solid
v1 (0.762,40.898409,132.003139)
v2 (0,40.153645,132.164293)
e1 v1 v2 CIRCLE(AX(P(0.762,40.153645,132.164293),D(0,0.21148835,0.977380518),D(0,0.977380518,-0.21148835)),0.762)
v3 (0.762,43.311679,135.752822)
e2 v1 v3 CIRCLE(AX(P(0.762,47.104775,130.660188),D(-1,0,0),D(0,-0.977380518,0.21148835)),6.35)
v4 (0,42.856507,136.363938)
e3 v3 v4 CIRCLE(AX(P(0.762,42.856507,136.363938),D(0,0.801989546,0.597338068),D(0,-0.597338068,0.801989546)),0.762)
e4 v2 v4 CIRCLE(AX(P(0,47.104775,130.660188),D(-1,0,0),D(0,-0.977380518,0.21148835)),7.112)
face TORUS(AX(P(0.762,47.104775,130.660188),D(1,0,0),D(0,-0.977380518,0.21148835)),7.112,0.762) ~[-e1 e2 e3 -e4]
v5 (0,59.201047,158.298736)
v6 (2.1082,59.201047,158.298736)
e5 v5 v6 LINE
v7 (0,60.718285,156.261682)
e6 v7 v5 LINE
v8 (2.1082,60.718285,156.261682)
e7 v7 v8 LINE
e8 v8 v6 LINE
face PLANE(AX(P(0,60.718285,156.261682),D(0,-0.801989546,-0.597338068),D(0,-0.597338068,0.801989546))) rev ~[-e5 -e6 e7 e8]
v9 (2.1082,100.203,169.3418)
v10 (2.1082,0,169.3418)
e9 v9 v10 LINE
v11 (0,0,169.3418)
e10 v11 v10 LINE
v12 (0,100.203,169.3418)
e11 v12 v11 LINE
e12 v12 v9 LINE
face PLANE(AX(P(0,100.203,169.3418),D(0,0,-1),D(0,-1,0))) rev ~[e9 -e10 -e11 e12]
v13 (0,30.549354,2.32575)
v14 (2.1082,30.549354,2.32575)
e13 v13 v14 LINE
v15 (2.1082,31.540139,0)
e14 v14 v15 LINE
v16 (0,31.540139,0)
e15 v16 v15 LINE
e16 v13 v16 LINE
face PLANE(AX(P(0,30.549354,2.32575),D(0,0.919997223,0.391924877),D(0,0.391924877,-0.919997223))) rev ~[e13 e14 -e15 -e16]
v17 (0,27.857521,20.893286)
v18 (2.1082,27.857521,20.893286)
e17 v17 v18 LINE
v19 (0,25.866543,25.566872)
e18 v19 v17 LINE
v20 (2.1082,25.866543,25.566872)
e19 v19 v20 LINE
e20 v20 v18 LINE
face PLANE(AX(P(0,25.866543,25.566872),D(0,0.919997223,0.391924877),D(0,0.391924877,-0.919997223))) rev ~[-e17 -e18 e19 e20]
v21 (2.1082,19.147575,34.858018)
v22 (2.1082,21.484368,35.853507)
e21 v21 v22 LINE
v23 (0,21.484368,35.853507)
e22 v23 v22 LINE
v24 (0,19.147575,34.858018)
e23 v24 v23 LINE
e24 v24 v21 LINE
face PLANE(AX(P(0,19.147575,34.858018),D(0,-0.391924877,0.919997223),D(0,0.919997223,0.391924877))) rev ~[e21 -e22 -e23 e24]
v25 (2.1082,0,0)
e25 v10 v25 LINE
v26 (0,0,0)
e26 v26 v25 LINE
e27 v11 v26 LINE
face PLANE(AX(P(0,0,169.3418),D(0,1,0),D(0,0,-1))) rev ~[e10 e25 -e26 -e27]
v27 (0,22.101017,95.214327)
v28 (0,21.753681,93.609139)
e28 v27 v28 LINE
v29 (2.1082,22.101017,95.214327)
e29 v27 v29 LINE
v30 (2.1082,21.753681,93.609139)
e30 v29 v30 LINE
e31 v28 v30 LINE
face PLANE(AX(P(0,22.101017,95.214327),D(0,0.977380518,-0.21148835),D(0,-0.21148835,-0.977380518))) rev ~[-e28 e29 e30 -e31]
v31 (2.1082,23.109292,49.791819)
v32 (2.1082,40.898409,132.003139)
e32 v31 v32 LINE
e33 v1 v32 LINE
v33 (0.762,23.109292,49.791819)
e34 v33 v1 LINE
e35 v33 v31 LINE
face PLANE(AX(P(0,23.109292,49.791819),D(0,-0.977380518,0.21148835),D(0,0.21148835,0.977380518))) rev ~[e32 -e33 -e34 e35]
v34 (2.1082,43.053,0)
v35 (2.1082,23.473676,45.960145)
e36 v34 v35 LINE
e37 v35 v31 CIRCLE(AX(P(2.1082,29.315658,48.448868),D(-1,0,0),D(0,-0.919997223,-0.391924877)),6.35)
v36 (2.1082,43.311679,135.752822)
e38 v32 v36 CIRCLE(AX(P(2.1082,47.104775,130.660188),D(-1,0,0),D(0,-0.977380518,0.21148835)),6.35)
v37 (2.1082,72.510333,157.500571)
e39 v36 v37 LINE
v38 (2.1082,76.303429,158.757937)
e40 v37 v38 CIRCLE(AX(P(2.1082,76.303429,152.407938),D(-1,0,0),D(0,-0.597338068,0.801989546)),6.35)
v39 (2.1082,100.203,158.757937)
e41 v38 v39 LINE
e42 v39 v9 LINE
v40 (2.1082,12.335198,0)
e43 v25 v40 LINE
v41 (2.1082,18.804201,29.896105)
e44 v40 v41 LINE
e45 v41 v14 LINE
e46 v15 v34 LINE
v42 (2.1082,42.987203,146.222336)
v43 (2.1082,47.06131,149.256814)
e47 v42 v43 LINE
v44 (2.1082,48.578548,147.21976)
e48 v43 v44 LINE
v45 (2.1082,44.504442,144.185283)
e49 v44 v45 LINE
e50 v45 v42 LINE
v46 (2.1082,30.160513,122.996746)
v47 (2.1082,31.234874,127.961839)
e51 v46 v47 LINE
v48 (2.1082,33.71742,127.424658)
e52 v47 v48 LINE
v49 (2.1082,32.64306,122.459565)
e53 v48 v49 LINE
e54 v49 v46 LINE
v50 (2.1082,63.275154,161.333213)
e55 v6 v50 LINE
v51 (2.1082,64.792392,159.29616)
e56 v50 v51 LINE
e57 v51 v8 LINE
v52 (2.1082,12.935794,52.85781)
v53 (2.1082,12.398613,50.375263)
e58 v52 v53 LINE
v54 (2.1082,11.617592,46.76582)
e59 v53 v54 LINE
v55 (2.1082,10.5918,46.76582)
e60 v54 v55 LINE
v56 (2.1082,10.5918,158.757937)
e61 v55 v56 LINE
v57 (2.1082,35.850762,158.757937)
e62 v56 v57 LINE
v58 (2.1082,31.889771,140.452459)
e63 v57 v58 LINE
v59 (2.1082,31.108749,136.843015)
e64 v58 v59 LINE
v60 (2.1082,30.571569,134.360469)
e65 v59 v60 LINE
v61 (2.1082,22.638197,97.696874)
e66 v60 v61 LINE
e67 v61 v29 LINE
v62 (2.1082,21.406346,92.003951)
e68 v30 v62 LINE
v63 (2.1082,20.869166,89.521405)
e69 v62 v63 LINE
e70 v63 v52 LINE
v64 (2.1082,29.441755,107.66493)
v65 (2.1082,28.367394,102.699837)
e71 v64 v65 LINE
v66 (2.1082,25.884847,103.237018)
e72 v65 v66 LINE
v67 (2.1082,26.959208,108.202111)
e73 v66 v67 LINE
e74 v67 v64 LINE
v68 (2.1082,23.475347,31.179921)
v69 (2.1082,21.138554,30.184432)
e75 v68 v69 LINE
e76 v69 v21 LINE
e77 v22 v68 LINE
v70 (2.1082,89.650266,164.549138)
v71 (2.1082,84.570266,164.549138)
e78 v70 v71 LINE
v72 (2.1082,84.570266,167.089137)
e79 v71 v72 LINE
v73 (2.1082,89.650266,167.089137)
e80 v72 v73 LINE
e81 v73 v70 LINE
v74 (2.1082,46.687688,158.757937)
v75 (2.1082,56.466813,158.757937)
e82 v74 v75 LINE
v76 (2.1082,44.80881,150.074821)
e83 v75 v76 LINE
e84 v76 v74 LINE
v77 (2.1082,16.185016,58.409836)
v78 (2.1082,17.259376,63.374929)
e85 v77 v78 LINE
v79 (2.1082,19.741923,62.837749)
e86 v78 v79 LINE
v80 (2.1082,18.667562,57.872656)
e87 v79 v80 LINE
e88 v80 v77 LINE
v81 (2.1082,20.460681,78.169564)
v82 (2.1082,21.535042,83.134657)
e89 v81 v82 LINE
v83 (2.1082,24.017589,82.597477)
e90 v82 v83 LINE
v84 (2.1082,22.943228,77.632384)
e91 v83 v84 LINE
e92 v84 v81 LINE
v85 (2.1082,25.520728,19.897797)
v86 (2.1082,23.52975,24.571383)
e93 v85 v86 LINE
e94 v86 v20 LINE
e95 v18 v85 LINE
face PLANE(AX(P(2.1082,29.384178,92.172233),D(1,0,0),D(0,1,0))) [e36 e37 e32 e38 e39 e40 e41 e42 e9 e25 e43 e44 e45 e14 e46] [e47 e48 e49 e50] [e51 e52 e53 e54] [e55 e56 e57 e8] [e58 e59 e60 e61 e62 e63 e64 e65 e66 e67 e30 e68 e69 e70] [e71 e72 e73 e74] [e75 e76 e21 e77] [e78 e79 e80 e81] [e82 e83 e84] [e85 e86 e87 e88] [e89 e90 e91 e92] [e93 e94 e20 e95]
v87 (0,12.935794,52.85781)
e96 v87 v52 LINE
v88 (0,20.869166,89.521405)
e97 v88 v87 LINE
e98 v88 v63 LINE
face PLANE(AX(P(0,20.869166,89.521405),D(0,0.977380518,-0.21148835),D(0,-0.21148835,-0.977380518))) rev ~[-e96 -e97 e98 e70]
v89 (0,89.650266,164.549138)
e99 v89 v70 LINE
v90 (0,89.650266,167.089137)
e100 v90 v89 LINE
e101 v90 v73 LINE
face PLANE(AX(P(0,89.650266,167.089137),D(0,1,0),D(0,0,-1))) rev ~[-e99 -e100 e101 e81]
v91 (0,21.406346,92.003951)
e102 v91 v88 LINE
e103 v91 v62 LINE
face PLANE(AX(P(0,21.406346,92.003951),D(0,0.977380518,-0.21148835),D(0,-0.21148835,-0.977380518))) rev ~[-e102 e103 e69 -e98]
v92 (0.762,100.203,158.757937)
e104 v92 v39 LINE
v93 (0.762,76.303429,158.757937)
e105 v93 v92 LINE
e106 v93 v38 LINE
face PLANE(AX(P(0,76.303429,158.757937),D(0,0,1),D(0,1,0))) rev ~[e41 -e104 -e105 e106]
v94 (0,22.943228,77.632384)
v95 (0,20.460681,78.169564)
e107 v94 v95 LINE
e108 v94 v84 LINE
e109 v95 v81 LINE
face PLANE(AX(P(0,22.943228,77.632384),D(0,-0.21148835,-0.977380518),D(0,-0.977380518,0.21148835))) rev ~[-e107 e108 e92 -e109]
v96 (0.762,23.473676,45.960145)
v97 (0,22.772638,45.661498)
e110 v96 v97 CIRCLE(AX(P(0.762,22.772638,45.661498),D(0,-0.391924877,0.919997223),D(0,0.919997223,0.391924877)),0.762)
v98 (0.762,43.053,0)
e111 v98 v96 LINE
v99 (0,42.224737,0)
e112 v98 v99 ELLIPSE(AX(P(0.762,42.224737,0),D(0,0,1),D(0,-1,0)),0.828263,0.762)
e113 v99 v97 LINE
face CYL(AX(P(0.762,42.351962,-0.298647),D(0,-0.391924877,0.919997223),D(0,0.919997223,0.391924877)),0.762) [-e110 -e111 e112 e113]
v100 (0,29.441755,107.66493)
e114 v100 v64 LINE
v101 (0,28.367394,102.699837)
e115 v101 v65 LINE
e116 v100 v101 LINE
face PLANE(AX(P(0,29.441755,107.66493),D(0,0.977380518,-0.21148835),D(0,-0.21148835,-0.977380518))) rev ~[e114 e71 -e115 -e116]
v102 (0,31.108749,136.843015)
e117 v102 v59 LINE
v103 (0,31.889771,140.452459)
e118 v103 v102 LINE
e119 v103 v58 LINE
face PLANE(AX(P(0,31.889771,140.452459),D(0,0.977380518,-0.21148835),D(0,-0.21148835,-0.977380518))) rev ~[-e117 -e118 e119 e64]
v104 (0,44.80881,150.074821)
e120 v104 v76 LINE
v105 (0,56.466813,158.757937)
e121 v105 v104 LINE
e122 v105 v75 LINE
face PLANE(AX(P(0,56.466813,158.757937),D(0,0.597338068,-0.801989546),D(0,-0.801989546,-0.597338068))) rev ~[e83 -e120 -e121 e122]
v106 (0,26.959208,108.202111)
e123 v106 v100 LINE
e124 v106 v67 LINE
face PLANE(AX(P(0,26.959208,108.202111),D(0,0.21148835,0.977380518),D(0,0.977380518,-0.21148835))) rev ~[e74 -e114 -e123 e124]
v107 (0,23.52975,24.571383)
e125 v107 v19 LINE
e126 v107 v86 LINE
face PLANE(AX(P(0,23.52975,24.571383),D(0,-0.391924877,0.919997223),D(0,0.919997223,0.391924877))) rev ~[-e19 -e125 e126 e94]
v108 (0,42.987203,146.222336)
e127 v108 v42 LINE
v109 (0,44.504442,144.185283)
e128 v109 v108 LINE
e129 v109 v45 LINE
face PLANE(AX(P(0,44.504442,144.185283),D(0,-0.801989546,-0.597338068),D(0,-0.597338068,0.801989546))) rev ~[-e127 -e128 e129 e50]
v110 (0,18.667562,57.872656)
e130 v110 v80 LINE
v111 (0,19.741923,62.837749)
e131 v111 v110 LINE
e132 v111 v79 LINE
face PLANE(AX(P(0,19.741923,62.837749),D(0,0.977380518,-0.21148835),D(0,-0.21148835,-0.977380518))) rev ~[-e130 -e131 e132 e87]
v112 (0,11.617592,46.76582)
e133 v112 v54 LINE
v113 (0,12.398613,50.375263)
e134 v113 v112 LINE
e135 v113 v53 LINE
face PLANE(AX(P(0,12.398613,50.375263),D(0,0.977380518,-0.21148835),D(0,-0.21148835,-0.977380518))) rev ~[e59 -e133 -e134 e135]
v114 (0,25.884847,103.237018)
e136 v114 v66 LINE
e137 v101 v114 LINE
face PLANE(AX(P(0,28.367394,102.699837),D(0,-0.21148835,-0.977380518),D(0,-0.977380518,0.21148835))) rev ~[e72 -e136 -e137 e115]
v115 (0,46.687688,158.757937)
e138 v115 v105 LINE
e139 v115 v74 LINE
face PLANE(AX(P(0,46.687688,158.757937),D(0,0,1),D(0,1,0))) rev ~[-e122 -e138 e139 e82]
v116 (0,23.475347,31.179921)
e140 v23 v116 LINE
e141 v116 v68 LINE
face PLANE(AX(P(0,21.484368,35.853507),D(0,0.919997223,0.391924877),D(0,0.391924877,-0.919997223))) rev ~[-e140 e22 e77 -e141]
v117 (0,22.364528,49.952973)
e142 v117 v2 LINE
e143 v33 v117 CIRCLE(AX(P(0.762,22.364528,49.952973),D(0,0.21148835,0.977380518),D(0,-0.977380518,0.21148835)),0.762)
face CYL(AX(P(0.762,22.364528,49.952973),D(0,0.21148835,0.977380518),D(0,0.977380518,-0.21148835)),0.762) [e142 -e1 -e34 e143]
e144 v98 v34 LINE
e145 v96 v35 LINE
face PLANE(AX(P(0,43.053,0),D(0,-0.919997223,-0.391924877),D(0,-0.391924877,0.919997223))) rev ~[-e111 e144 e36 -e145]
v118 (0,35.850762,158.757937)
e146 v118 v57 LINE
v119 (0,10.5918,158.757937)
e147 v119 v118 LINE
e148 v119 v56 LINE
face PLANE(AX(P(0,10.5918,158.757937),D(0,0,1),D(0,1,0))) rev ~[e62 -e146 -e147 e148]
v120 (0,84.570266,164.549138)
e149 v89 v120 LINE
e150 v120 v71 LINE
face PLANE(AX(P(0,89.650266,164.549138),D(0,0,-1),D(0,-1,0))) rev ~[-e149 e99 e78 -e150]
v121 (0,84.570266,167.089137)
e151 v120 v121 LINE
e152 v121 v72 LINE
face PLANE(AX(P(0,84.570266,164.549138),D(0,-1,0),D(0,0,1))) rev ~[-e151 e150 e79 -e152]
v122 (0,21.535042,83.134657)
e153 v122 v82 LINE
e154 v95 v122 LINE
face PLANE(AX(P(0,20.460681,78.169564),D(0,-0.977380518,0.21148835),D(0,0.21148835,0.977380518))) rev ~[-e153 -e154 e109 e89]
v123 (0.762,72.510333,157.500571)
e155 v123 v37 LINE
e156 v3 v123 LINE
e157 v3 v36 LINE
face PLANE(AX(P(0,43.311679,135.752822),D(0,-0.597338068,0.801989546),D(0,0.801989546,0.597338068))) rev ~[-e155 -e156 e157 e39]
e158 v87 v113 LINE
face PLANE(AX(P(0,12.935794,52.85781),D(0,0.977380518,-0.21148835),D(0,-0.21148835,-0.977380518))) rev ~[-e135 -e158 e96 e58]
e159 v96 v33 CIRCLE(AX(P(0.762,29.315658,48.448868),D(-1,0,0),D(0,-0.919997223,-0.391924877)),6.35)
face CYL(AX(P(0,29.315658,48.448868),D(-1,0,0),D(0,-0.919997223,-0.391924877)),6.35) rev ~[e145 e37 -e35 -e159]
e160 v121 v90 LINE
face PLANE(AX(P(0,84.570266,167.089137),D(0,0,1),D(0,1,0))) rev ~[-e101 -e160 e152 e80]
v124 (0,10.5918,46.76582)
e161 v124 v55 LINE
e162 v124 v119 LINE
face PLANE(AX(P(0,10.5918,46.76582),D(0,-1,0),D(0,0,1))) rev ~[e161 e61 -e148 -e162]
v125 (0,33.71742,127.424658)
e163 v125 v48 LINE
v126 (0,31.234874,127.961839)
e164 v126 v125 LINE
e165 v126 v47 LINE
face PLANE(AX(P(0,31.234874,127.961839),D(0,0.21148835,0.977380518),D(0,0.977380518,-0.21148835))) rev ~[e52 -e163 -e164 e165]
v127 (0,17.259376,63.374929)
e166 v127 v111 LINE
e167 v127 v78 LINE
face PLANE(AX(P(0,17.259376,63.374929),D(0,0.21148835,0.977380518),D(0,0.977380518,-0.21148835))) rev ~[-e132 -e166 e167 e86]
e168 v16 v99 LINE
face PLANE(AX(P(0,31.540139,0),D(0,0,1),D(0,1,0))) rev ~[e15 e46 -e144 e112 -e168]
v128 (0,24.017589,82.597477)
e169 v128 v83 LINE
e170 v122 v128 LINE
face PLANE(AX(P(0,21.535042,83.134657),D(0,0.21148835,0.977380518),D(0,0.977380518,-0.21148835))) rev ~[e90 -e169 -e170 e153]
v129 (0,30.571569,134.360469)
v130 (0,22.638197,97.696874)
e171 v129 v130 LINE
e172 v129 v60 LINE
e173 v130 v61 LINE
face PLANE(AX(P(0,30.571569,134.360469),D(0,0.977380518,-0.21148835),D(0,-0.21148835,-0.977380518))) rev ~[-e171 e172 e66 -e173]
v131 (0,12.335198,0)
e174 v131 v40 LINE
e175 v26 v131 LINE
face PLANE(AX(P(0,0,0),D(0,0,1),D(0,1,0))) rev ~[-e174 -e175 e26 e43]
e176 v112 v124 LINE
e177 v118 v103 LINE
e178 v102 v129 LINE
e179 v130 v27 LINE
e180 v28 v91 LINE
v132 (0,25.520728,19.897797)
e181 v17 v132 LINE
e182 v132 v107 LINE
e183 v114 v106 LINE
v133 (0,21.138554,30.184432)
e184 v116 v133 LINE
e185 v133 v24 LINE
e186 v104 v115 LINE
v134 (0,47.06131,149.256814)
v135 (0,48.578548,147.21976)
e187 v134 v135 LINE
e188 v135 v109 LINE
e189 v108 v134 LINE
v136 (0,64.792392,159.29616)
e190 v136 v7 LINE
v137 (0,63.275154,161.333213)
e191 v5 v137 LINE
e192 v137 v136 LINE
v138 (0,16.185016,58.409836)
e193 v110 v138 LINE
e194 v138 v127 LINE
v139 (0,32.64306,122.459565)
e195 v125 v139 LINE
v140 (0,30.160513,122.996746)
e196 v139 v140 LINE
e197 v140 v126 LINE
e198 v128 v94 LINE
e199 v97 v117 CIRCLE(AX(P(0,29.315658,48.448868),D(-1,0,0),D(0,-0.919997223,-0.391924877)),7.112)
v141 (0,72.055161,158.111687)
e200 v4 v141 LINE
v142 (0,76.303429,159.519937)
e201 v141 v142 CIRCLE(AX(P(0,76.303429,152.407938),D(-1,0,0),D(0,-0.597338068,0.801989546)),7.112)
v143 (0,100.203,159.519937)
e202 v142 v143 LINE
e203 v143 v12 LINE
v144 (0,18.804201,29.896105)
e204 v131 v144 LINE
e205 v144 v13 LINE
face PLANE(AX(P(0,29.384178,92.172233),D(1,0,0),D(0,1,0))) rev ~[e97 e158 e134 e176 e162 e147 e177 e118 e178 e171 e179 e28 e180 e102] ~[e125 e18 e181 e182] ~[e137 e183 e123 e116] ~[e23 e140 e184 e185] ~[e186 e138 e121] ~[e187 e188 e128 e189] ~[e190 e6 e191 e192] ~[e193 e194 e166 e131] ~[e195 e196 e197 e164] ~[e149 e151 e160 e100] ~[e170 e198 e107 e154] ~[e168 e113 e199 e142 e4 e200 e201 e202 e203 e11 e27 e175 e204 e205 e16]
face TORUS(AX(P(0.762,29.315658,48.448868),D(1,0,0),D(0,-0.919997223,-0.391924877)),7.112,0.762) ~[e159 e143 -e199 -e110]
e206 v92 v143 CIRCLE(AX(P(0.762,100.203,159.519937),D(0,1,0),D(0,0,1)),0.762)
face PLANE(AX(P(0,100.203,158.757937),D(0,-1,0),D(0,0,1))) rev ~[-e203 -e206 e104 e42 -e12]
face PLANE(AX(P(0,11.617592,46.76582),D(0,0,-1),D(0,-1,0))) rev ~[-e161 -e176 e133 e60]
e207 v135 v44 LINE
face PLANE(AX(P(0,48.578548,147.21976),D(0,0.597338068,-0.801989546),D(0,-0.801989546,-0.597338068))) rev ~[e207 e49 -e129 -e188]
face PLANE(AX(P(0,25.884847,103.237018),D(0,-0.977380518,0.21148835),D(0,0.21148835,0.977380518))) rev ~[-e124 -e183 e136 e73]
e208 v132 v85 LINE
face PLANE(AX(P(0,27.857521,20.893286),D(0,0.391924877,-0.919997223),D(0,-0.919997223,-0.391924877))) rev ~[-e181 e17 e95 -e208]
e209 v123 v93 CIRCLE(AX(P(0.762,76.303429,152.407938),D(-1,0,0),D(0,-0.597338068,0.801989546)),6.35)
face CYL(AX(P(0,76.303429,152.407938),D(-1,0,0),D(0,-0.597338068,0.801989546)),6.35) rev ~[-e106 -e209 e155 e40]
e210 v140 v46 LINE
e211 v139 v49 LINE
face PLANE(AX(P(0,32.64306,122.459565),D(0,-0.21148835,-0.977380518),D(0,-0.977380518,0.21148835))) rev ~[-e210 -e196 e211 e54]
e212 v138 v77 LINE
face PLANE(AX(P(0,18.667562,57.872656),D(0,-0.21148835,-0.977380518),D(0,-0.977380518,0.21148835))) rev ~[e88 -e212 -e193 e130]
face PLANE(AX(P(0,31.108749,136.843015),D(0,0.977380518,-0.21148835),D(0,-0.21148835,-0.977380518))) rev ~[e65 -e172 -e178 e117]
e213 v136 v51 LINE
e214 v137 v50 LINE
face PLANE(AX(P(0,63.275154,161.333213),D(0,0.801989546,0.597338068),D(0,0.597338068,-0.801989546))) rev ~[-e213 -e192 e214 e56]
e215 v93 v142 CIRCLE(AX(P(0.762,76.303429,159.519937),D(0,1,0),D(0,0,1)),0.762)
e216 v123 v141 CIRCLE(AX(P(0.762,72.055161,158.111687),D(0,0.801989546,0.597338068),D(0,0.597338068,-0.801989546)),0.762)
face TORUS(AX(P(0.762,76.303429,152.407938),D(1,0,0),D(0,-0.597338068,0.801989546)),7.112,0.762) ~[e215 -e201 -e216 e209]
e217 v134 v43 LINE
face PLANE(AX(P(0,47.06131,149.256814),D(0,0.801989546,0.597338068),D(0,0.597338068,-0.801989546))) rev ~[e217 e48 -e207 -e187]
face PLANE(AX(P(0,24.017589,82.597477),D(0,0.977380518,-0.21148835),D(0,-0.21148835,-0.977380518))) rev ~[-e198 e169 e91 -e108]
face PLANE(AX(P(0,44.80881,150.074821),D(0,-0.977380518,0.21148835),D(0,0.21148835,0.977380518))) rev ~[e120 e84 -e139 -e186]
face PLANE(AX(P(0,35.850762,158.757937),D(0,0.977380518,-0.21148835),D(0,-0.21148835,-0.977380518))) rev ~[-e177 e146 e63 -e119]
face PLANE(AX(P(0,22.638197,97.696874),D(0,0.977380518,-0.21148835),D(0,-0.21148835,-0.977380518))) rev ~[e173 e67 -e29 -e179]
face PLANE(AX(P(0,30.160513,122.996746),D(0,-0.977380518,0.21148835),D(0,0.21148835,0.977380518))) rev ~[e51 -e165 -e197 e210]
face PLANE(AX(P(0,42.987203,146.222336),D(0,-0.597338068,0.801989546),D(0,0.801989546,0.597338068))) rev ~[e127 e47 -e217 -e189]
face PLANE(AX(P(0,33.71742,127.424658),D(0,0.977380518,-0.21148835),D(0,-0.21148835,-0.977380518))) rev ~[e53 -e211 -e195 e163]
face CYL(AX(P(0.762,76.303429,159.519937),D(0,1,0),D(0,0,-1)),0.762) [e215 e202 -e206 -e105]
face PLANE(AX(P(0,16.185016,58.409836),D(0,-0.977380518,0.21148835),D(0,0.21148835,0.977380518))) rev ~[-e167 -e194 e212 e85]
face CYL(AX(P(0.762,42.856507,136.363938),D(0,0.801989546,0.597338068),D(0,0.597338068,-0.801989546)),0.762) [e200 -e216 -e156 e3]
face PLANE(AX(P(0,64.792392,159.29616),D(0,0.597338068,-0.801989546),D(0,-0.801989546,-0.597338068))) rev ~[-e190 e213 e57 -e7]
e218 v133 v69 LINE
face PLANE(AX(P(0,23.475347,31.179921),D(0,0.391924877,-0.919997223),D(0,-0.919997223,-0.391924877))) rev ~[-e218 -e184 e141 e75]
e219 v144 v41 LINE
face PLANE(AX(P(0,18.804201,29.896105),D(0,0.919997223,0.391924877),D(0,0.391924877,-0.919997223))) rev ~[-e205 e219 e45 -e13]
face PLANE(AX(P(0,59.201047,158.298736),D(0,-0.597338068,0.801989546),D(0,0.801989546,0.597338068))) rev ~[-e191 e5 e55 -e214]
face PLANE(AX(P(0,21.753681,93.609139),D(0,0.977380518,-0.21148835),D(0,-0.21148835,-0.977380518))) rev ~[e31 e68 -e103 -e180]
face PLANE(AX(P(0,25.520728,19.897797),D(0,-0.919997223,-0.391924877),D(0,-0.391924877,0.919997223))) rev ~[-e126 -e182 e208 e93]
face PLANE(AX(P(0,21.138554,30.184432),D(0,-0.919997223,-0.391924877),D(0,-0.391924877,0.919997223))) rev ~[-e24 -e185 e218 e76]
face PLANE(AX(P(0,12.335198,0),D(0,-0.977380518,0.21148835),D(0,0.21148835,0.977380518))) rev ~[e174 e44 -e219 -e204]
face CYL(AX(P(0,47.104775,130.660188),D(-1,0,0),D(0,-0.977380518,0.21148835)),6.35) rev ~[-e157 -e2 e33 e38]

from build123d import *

# Parameters (mm, degrees)
F0_W     = 5.08
F0_H     = 2.54
F1_DEPTH = 2.1082
F2_R     = 0.762


with BuildPart() as f1:
    # F0 (on Right) → F1 (new body)
    with BuildSketch(Plane.YZ):
        with BuildLine():
            Line((0, 162.0091375), (0, 0))
            Line((0, 0), (12.335197777, 0))
            Line((12.335197777, 0), (18.8042013144, 29.896105485))
            Line((18.8042013144, 29.896105485), (30.5493542935, 2.3257501254))
            Line((30.5493542935, 2.3257501254), (31.5401391658, 0))
            Line((31.5401391658, 0), (31.5707651968, 0))
            Line((31.5707651968, 0), (40.8442968098, 0))
            Line((40.8442968098, 0), (20.5594925834, 47.616175108))
            Line((20.5594925834, 47.616175108), (39.5771112022, 135.5049402038))
            Line((39.5771112022, 135.5049402038), (73.5248959406, 160.7899383022))
            Line((73.5248959406, 160.7899383022), (100.203, 160.7899383022))
            Line((100.203, 160.7899383022), (100.203, 162.0091375))
            Line((100.203, 162.0091375), (82.1398573303, 162.0091375))
            ThreePointArc((82.1398573303, 162.0091375), (80.3438061061, 162.7530862758), (79.5998573303, 164.5491375))
            Line((79.5998573303, 164.5491375), (79.5998573303, 169.3418))
            Line((79.5998573303, 169.3418), (70.6874244764, 169.3418))
            Line((70.6874244764, 169.3418), (70.6874244764, 165.8480664454))
            Line((70.6874244764, 165.8480664454), (70.6874244764, 164.5491375))
            ThreePointArc((70.6874244764, 164.5491375), (70.0510915867, 162.8675752701), (68.4609272063, 162.0285589874))
            ThreePointArc((68.4609272063, 162.0285589874), (68.3044763435, 162.0139975214), (68.1474244764, 162.0091375))
            Line((68.1474244764, 162.0091375), (0, 162.0091375))
        make_face()
        Polygon((21.4843682503, 35.8535070154), (23.4753466245, 31.1799211209), (21.1385536773, 30.1844319338), (19.147575303, 34.8580178283), align=None, mode=Mode.SUBTRACT)
        Polygon((25.8665425285, 25.5668719827), (27.8575209028, 20.8932860882), (25.5207279555, 19.8977969011), (23.5297495813, 24.5713827956), align=None, mode=Mode.SUBTRACT)
        with BuildLine():
            Line((12.3986134924, 50.3752630702), (11.6175919588, 46.7658196656))
            Line((11.6175919588, 46.7658196656), (10.5918, 46.7658196656))
            Line((10.5918, 46.7658196656), (10.5918, 158.7579375))
            Line((10.5918, 158.7579375), (35.8507619547, 158.7579375))
            Line((35.8507619547, 158.7579375), (31.8897708968, 140.4524587956))
            Line((31.8897708968, 140.4524587956), (31.1087493632, 136.8430153909))
            Line((31.1087493632, 136.8430153909), (35.5475592049, 135.882533211))
            ThreePointArc((35.5475592049, 135.882533211), (37.1456481821, 134.7755682604), (37.4929253116, 132.8628062845))
            Line((37.4929253116, 132.8628062845), (29.5595533377, 96.1992113407))
            ThreePointArc((29.5595533377, 96.1992113407), (28.452588387, 94.6011223635), (26.5398264112, 94.2538452339))
            Line((26.5398264112, 94.2538452339), (22.1010165695, 95.2143274138))
            Line((22.1010165695, 95.2143274138), (21.7536814278, 93.6091392306))
            Line((21.7536814278, 93.6091392306), (21.4063462861, 92.0039510473))
            Line((21.4063462861, 92.0039510473), (25.8451561277, 91.0434688674))
            ThreePointArc((25.8451561277, 91.0434688674), (27.4432451049, 89.9365039168), (27.7905222345, 88.0237419409))
            Line((27.7905222345, 88.0237419409), (19.8571502605, 51.3601469971))
            ThreePointArc((19.8571502605, 51.3601469971), (18.7501853099, 49.7620580199), (16.837423334, 49.4147808903))
            Line((16.837423334, 49.4147808903), (12.3986134924, 50.3752630702))
        make_face(mode=Mode.SUBTRACT)
        Polygon((47.0613097153, 149.2568137468), (48.5785484084, 147.2197602993), (44.5044415132, 144.1852829132), (42.9872028202, 146.2223363607), align=None, mode=Mode.SUBTRACT)
        Polygon((44.8088104432, 150.074821282), (46.6876875952, 158.7579375), (56.4668125154, 158.7579375), align=None, mode=Mode.SUBTRACT)
        Polygon((63.2751536106, 161.3332132886), (64.7923923036, 159.296159841), (60.7182854085, 156.2616824549), (59.2010467154, 158.2987359025), align=None, mode=Mode.SUBTRACT)
        with BuildLine():
            Line((0, 164.5491375), (0, 162.0091375))
            Line((0, 162.0091375), (68.1474244764, 162.0091375))
            ThreePointArc((68.1474244764, 162.0091375), (68.3044763435, 162.0139975214), (68.4609272063, 162.0285589874))
            Line((68.4609272063, 162.0285589874), (69.6856973646, 162.9407926238))
            Line((69.6856973646, 162.9407926238), (68.1474244764, 165.0060867035))
            Line((68.1474244764, 165.0060867035), (68.1474244764, 164.5491375))
            Line((68.1474244764, 164.5491375), (55.1748093832, 164.5491375))
            Line((55.1748093832, 164.5491375), (50.0948093832, 164.5491375))
            Line((50.0948093832, 164.5491375), (10.3999171089, 164.5491375))
            Line((10.3999171089, 164.5491375), (5.3199171089, 164.5491375))
            Line((5.3199171089, 164.5491375), (0, 164.5491375))
        make_face()
        Polygon((0, 169.3418), (0, 164.5491375), (5.3199171089, 164.5491375), (5.3199171089, 167.0891375), (10.3999171089, 167.0891375), (10.3999171089, 164.5491375), (50.0948093832, 164.5491375), (50.0948093832, 167.0891375), (55.1748093832, 167.0891375), (55.1748093832, 164.5491375), (68.1474244764, 164.5491375), (68.1474244764, 165.0060867035), (68.1474244764, 169.3418), align=None)
        with Locations((7.8599171089, 165.8191375)):
            Rectangle(F0_W, F0_H)
        with BuildLine():
            Line((69.6856973646, 162.9407926238), (68.4609272063, 162.0285589874))
            ThreePointArc((68.4609272063, 162.0285589874), (70.0510915867, 162.8675752701), (70.6874244764, 164.5491375))
            Line((70.6874244764, 164.5491375), (70.6874244764, 165.8480664454))
            Line((70.6874244764, 165.8480664454), (70.6874244764, 169.3418))
            Line((70.6874244764, 169.3418), (68.1474244764, 169.3418))
            Line((68.1474244764, 169.3418), (68.1474244764, 165.0060867035))
            Line((68.1474244764, 165.0060867035), (69.6856973646, 162.9407926238))
        make_face()
        with Locations((52.6348093832, 165.8191375)):
            Rectangle(F0_W, F0_H)
        with BuildLine():
            Line((20.5594925834, 47.616175108), (40.8442968098, 0))
            Line((40.8442968098, 0), (43.053, 0))
            Line((43.053, 0), (23.4736756901, 45.9601445708))
            ThreePointArc((23.4736756901, 45.9601445708), (22.9941781878, 47.847708452), (23.1092917667, 49.7918185633))
            Line((23.1092917667, 49.7918185633), (40.8984089502, 132.0031391675))
            ThreePointArc((40.8984089502, 132.0031391675), (41.765080018, 134.0967787378), (43.3116785091, 135.7528217618))
            Line((43.3116785091, 135.7528217618), (72.5103326221, 157.500571119))
            ThreePointArc((72.5103326221, 157.500571119), (74.3053957564, 158.4354047741), (76.3034293547, 158.7579375))
            Line((76.3034293547, 158.7579375), (100.203, 158.7579375))
            Line((100.203, 158.7579375), (100.203, 160.7899383022))
            Line((100.203, 160.7899383022), (73.5248959406, 160.7899383022))
            Line((73.5248959406, 160.7899383022), (39.5771112022, 135.5049402038))
            Line((39.5771112022, 135.5049402038), (20.5594925834, 47.616175108))
        make_face()
        with BuildLine():
            Line((82.1398573303, 169.3418), (79.5998573303, 169.3418))
            Line((79.5998573303, 169.3418), (79.5998573303, 164.5491375))
            ThreePointArc((79.5998573303, 164.5491375), (80.3438061061, 162.7530862758), (82.1398573303, 162.0091375))
            Line((82.1398573303, 162.0091375), (100.203, 162.0091375))
            Line((100.203, 162.0091375), (100.203, 164.5491375))
            Line((100.203, 164.5491375), (89.6502663064, 164.5491375))
            Line((89.6502663064, 164.5491375), (84.5702663064, 164.5491375))
            Line((84.5702663064, 164.5491375), (82.1398573303, 164.5491375))
            Line((82.1398573303, 164.5491375), (82.1398573303, 169.3418))
        make_face()
        Polygon((100.203, 169.3418), (82.1398573303, 169.3418), (82.1398573303, 164.5491375), (84.5702663064, 164.5491375), (84.5702663064, 167.0891375), (89.6502663064, 167.0891375), (89.6502663064, 164.5491375), (100.203, 164.5491375), align=None)
        with BuildLine():
            Line((12.9357939022, 52.8578095868), (12.3986134924, 50.3752630702))
            Line((12.3986134924, 50.3752630702), (16.837423334, 49.4147808903))
            ThreePointArc((16.837423334, 49.4147808903), (18.7501853099, 49.7620580199), (19.8571502605, 51.3601469971))
            Line((19.8571502605, 51.3601469971), (27.7905222345, 88.0237419409))
            ThreePointArc((27.7905222345, 88.0237419409), (27.4432451049, 89.9365039168), (25.8451561277, 91.0434688674))
            Line((25.8451561277, 91.0434688674), (21.4063462861, 92.0039510473))
            Line((21.4063462861, 92.0039510473), (20.8691658762, 89.5214045307))
            Line((20.8691658762, 89.5214045307), (25.3079757178, 88.5609223508))
            Line((25.3079757178, 88.5609223508), (24.0175885553, 82.5974767434))
            Line((24.0175885553, 82.5974767434), (22.9432277355, 77.6323837102))
            Line((22.9432277355, 77.6323837102), (19.7419229759, 62.8377489213))
            Line((19.7419229759, 62.8377489213), (18.6675621562, 57.872655888))
            Line((18.6675621562, 57.872655888), (17.3746037439, 51.8973274069))
            Line((17.3746037439, 51.8973274069), (12.9357939022, 52.8578095868))
        make_face()
        Polygon((20.8691658762, 89.5214045307), (12.9357939022, 52.8578095868), (17.3746037439, 51.8973274069), (18.6675621562, 57.872655888), (16.1850156395, 58.4098362979), (17.2593764593, 63.3749293312), (19.7419229759, 62.8377489213), (22.9432277355, 77.6323837102), (20.4606812189, 78.16956412), (21.5350420386, 83.1346571533), (24.0175885553, 82.5974767434), (25.3079757178, 88.5609223508), align=None)
        with BuildLine():
            Line((35.5475592049, 135.882533211), (31.1087493632, 136.8430153909))
            Line((31.1087493632, 136.8430153909), (30.5715689534, 134.3604688743))
            Line((30.5715689534, 134.3604688743), (35.010378795, 133.3999866944))
            Line((35.010378795, 133.3999866944), (33.7174203827, 127.4246582133))
            Line((33.7174203827, 127.4246582133), (32.643059563, 122.45956518))
            Line((32.643059563, 122.45956518), (29.4417548033, 107.6649303911))
            Line((29.4417548033, 107.6649303911), (28.3673939836, 102.6998373579))
            Line((28.3673939836, 102.6998373579), (27.077006821, 96.7363917505))
            Line((27.077006821, 96.7363917505), (22.6381969794, 97.6968739305))
            Line((22.6381969794, 97.6968739305), (22.1010165695, 95.2143274138))
            Line((22.1010165695, 95.2143274138), (26.5398264112, 94.2538452339))
            ThreePointArc((26.5398264112, 94.2538452339), (28.452588387, 94.6011223635), (29.5595533377, 96.1992113407))
            Line((29.5595533377, 96.1992113407), (37.4929253116, 132.8628062845))
            ThreePointArc((37.4929253116, 132.8628062845), (37.1456481821, 134.7755682604), (35.5475592049, 135.882533211))
        make_face()
        Polygon((35.010378795, 133.3999866944), (30.5715689534, 134.3604688743), (22.6381969794, 97.6968739305), (27.077006821, 96.7363917505), (28.3673939836, 102.6998373579), (25.884847467, 103.2370177677), (26.9592082867, 108.202110801), (29.4417548033, 107.6649303911), (32.643059563, 122.45956518), (30.1605130463, 122.9967455899), (31.2348738661, 127.9618386231), (33.7174203827, 127.4246582133), align=None)
    extrude(amount=F1_DEPTH)

    # F2
    f2_edges = [f1.edges().sort_by_distance(p)[0] for p in [
        (0, 57.911006, 146.626696),
        (0, 33.263338, 22.980072),
        (0, 22.994178, 47.847708),
        (0, 32.00385, 90.897479),
        (0, 41.76508, 134.096779),
        (0, 74.305396, 158.435405),
        (0, 88.253215, 158.757937),
    ]]
    fillet(f2_edges, radius=F2_R)


solid = f1.part
